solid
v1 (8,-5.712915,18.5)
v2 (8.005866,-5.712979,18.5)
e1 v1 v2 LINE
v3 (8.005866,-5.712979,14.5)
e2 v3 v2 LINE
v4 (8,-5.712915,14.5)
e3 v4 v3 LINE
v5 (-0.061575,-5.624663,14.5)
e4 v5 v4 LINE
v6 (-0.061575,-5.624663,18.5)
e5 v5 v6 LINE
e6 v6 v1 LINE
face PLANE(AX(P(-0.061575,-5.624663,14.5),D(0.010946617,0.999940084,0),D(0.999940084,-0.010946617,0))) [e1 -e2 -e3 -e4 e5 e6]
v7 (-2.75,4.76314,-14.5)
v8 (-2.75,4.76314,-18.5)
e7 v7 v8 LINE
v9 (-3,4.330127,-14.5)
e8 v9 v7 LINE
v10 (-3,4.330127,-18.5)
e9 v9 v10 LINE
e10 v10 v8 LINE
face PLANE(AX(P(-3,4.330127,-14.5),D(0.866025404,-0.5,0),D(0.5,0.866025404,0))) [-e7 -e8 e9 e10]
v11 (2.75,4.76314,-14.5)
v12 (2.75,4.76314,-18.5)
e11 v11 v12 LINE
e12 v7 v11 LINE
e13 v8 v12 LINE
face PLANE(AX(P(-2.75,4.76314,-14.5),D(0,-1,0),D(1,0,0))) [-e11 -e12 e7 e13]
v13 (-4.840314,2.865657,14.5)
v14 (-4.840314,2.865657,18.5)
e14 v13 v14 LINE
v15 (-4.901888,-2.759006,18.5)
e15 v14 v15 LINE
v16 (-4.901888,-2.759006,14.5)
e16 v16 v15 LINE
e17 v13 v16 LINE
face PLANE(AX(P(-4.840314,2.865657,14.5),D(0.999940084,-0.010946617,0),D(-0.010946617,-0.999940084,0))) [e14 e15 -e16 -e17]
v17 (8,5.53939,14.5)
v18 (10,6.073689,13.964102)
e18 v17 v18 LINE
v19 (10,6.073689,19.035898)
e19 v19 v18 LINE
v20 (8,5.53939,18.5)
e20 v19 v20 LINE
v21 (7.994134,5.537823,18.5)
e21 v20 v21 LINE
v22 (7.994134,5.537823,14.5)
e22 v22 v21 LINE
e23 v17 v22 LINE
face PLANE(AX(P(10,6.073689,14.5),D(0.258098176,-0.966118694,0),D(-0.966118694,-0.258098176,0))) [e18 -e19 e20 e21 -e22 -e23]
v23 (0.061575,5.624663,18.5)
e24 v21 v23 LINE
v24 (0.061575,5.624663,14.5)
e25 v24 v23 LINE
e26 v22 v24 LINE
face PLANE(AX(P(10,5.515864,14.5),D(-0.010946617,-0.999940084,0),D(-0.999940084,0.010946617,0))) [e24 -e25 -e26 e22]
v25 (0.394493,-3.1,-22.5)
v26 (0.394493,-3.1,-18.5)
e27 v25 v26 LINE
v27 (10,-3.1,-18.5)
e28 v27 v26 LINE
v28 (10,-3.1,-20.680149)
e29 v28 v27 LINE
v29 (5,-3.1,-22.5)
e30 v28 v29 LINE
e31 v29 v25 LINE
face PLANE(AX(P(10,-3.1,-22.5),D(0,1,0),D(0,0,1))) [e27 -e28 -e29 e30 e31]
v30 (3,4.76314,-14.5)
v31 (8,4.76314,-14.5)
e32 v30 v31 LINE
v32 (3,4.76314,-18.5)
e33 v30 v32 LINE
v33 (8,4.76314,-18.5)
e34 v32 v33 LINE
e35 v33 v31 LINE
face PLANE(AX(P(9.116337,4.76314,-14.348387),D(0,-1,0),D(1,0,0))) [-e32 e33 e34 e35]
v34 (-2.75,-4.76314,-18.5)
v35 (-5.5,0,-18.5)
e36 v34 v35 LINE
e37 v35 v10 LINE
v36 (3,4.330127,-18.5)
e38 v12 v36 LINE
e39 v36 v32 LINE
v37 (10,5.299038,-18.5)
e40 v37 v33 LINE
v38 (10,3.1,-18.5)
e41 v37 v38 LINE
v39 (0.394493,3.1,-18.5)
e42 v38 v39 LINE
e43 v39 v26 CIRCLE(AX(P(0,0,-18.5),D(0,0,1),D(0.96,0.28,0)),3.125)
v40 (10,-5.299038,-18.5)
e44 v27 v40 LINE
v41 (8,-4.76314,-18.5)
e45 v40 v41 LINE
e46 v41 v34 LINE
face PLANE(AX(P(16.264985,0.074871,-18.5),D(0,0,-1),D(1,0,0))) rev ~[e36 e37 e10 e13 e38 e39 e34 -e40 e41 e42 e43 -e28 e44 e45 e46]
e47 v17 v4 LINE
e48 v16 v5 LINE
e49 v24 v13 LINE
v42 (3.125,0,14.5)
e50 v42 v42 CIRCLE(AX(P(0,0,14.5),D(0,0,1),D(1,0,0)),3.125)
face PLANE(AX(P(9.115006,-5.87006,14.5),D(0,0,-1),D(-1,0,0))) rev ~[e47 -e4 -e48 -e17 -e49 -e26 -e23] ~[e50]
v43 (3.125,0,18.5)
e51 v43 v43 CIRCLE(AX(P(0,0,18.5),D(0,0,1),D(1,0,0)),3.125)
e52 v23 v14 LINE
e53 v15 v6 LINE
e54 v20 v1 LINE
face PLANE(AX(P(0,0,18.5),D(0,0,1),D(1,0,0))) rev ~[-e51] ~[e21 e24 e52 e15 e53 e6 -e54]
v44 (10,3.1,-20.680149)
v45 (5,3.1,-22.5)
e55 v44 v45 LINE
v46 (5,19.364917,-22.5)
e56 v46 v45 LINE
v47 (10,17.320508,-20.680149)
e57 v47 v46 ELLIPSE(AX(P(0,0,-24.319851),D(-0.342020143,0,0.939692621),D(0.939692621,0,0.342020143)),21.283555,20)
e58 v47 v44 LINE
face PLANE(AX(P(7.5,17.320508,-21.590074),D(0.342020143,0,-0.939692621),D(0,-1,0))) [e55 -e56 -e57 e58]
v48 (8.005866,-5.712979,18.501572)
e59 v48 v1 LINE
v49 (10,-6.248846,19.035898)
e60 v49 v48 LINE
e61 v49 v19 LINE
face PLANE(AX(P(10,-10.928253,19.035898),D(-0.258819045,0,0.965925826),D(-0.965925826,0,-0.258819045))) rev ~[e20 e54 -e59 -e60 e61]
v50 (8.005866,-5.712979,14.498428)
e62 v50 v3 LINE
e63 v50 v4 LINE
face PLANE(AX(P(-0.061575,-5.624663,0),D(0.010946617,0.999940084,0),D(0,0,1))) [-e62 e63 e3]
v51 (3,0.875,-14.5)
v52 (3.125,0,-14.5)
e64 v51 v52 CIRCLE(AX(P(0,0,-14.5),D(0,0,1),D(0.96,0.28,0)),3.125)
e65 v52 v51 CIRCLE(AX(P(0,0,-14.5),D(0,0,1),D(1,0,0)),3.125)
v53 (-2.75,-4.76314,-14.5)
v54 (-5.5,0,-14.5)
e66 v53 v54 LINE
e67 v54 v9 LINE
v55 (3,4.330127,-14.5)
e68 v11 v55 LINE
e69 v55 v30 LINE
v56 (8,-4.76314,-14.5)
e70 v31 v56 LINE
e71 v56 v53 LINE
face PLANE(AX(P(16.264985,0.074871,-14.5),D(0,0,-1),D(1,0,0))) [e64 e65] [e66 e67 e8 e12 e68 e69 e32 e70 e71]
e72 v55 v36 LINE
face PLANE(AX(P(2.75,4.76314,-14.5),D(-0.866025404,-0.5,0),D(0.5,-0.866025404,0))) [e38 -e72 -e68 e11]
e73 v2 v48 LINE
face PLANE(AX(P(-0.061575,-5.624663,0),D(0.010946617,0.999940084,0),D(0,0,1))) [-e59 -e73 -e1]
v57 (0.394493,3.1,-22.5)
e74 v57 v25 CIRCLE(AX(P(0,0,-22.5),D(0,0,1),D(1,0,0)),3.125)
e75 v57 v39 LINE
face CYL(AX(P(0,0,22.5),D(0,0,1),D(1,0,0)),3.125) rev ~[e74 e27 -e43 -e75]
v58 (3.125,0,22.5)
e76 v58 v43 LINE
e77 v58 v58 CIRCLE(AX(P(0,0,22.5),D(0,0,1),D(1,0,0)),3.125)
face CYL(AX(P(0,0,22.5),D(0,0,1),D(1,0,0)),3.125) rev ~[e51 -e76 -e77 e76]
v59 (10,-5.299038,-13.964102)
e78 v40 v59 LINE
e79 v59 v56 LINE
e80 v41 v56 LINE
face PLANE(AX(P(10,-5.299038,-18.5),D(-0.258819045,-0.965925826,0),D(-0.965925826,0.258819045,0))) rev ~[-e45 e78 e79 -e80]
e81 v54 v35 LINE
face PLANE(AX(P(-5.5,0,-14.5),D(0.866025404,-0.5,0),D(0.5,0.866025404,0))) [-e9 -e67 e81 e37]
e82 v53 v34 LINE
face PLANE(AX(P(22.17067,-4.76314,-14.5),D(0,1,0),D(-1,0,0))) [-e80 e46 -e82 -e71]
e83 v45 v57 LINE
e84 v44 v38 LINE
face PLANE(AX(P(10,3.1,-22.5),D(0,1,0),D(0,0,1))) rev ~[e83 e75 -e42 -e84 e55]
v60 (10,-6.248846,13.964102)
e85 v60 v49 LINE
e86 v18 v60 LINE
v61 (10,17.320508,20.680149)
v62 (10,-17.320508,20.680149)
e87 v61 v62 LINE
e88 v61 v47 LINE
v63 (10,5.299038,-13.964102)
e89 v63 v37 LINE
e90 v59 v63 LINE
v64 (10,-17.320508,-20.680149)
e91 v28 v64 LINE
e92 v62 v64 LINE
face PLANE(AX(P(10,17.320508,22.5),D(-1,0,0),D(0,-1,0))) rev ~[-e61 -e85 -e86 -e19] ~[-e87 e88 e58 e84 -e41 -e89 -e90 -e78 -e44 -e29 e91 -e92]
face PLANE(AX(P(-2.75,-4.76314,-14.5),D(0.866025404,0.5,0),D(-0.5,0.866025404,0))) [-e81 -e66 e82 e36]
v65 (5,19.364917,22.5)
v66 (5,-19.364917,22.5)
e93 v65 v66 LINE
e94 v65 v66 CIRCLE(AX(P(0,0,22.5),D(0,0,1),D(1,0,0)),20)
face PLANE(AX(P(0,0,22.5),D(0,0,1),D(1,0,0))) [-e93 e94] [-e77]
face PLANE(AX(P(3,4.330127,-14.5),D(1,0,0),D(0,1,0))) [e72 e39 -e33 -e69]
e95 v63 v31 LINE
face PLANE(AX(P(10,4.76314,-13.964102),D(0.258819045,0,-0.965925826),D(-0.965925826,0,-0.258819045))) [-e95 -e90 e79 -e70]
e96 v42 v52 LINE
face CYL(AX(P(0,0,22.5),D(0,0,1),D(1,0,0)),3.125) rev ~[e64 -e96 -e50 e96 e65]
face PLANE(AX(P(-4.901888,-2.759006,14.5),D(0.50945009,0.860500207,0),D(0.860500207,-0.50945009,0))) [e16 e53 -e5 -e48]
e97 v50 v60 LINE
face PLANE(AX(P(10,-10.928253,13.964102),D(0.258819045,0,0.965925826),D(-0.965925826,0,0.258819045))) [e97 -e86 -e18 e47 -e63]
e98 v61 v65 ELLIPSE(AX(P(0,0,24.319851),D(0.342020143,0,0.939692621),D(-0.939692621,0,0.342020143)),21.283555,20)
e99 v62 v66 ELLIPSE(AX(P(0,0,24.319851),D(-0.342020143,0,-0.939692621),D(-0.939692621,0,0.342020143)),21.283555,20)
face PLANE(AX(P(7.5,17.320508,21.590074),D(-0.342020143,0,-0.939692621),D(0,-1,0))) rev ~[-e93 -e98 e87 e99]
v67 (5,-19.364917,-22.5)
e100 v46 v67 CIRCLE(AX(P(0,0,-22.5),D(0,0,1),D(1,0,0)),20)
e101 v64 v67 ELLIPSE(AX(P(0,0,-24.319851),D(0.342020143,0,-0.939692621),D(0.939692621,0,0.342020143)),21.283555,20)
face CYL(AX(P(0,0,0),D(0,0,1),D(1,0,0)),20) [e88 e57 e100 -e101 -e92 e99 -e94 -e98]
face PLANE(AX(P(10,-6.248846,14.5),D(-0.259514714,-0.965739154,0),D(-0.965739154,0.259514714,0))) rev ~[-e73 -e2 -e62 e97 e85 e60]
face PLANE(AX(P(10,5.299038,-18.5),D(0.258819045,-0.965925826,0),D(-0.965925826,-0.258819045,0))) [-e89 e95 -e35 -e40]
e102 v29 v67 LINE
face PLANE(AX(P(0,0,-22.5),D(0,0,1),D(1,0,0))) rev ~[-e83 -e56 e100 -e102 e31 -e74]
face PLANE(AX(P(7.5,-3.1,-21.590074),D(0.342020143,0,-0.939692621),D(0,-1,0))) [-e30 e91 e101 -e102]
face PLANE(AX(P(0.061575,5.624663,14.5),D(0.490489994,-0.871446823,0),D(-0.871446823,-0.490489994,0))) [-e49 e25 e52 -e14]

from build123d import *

# Parameters (mm, degrees)
F0_R          = 20
F1_DEPTH      = 22.5
F2_R          = 3.125
F3_DEPTH      = 4
F5_DEPTH      = 45.001
F9_DEPTH      = 4
F12_W         = 6.2
F12_H         = 4
F13_DEPTH     = 10
F14_SIZE2     = 5
F14_SIZE      = 1.8198511713
F15_T1_DEPTH  = 9.5262794416
F15_T3_DEPTH  = 4
F15_T5_DEPTH  = 4
F15_T10_DEPTH = 21.6375603763
F15_T16_DEPTH = 21.6375603763
F15_T23_DEPTH = 14.719722582
F15_T27_DEPTH = 9.1934431404
F15_T34_DEPTH = 9.1934431404
F15_T38_DEPTH = 14.719722582
F15_T45_DEPTH = 21.6375603763
F15_T49_DEPTH = 9.179576725
F15_T56_DEPTH = 21.6375603763
F15_T60_DEPTH = 9.2078904559
F15_T67_DEPTH = 9.2078904559
F15_T72_DEPTH = 21.6375603763
F15_T79_DEPTH = 9.179576725
F15_T84_DEPTH = 21.6375603763


# Not quite as in the source:
# - a fillet or chamfer that OpenCascade refuses, or shapes differently, is made with other operations: its cross-section is extruded or revolved along the edge and cut away or added


with BuildPart() as f1:
    # F0 (on Top) → F1 (new body, symmetric)
    with BuildSketch(Plane.XY):
        Circle(F0_R)
    extrude(amount=F1_DEPTH, both=True)


with BuildPart() as f3:
    # F2 (on face) → F3 (new body)
    with BuildSketch(Plane.XY.offset(22.5)):
        Polygon((4.8403136616, -2.8656567585), (4.9018883821, 2.759006214), (0.0615747205, 5.6246629725), (-4.8403136616, 2.8656567585), (-4.9018883821, -2.759006214), (-0.0615747205, -5.6246629725), align=None)
        Circle(F2_R, mode=Mode.SUBTRACT)
        Polygon((0.0615747205, 5.6246629725), (4.9018883821, 2.759006214), (4.8403136616, -2.8656567585), (-0.0615747205, -5.6246629725), (10, -5.7348097768), (10, 5.5158643187), align=None)
        Circle(F2_R)
    extrude(amount=F3_DEPTH)


with BuildPart() as f3b:
    # F2 (on face) → F3, piece 2 (new body)
    with BuildSketch(Plane.XY.offset(22.5)):
        with BuildLine():
            Line((49.1066566767, 5.0877530758), (19.2531154371, 5.4145679388))
            ThreePointArc((19.2531154371, 5.4145679388), (19.812399006, 2.7329188844), (20, 0))
            ThreePointArc((20, 0), (19.7812957099, -2.9496338823), (19.1299659961, -5.8347580061))
            Line((19.1299659961, -5.8347580061), (49.1066566767, -6.1629210197))
            Line((49.1066566767, -6.1629210197), (49.1066566767, 5.0877530758))
        make_face()
    extrude(amount=F3_DEPTH)


with BuildPart() as f3_1:
    # F4: moved
    add(f3.part.moved(Location((0, 0, -8))))


with BuildPart() as f5_tool:
    # F2 (on face) → F5 (new body, through all)
    with BuildSketch(Plane.XY.offset(22.5)):
        Circle(F2_R)
        with BuildLine():
            Line((10, 17.3205080757), (10, 5.5158643187))
            Line((10, 5.5158643187), (19.2531154371, 5.4145679388))
            ThreePointArc((19.2531154371, 5.4145679388), (15.7915814069, 12.2729766833), (10, 17.3205080757))
        make_face()
        with BuildLine():
            Line((19.2531154371, 5.4145679388), (10, 5.5158643187))
            Line((10, 5.5158643187), (10, -5.7348097768))
            Line((10, -5.7348097768), (19.1299659961, -5.8347580061))
            ThreePointArc((19.1299659961, -5.8347580061), (19.7812957099, -2.9496338823), (20, 0))
            ThreePointArc((20, 0), (19.812399006, 2.7329188844), (19.2531154371, 5.4145679388))
        make_face()
        with BuildLine():
            Line((19.1299659961, -5.8347580061), (10, -5.7348097768))
            Line((10, -5.7348097768), (10, -17.3205080757))
            ThreePointArc((10, -17.3205080757), (15.6562876634, -12.4451057288), (19.1299659961, -5.8347580061))
        make_face()
    extrude(amount=-F5_DEPTH)


with BuildPart() as f1_1:
    add(f1.part)

    # F5: cut by f5_tool
    add(f5_tool.part, mode=Mode.SUBTRACT)


with BuildPart() as f3_2:
    add(f3_1.part)

    # F5: cut by f5_tool
    add(f5_tool.part, mode=Mode.SUBTRACT)


with BuildPart() as f1_2:
    add(f1_1.part)

    # F7: cut F3
    add(f3_2.part, mode=Mode.SUBTRACT)


with BuildPart() as f9:
    # F8 (on face) → F9 (new body)
    with BuildSketch(Plane(origin=(0, 0, -22.5), x_dir=(1, 0, 0), z_dir=(0, 0, -1))):
        Polygon((22.1706703305, 4.7631397208), (10, 4.7631397208), (10, -4.7631397208), (22.864067927, -4.7631397208), align=None)
        Polygon((2.75, 4.7631397208), (5.5, 0), (3, -4.3301270189), (3, -4.7631397208), (10, -4.7631397208), (10, 4.7631397208), align=None)
        with BuildLine():
            Line((3, -4.3301270189), (5.5, 0))
            Line((5.5, 0), (2.75, 4.7631397208))
            Line((2.75, 4.7631397208), (-2.75, 4.7631397208))
            Line((-2.75, 4.7631397208), (-5.5, 0))
            Line((-5.5, 0), (-3, -4.3301270189))
            Line((-3, -4.3301270189), (-3, -0.875))
            ThreePointArc((-3, -0.875), (-0.4419417382, 3.0935921677), (3.125, 0))
            ThreePointArc((3.125, 0), (3.0935921677, -0.4419417382), (3, -0.875))
            Line((3, -0.875), (3, -4.3301270189))
        make_face()
        with BuildLine():
            Line((2.75, -4.7631397208), (3, -4.3301270189))
            Line((3, -4.3301270189), (3, -0.875))
            ThreePointArc((3, -0.875), (0, -3.125), (-3, -0.875))
            Line((-3, -0.875), (-3, -4.3301270189))
            Line((-3, -4.3301270189), (-2.75, -4.7631397208))
            Line((-2.75, -4.7631397208), (2.75, -4.7631397208))
        make_face()
    extrude(amount=F9_DEPTH)


with BuildPart() as f9_1:
    # F10: moved
    add(f9.part.moved(Location((0, 0, 8))))


with BuildPart() as f1_3:
    add(f1_2.part)

    # F11: cut F9
    add(f9_1.part, mode=Mode.SUBTRACT)

    # F12 (on face) → F13 (cut)
    with BuildSketch(Plane.YZ.offset(10)):
        with Locations((0, -20.5)):
            Rectangle(F12_W, F12_H)
    extrude(amount=-F13_DEPTH, mode=Mode.SUBTRACT)

    # F14
    f14_edges = [f1_3.edges().sort_by_distance(p)[0] for p in [
        (10, -10.210254, -22.5),
        (10, 10.210254, -22.5),
        (10, 0, 22.5),
    ]]
    f14_side = f1_3.faces().sort_by_distance((10, 0.003395, 0.271955))[0]
    chamfer(f14_edges, length=F14_SIZE, length2=F14_SIZE2, reference=f14_side)

    # F15: chamfer of 2 x 0.5358983849 on 7 edges, made by hand

    # F15_s2 → F15_t1 (cut)
    with BuildSketch(Plane.XZ.offset(-4.7631397208)):
        Polygon((10, -13.9641016151), (8, -14.5), (10, -14.5), align=None)
    extrude(amount=F15_T1_DEPTH, mode=Mode.SUBTRACT)

    # F15_s4 → F15_t3 (cut)
    with BuildSketch(Plane.XY.offset(14.5)):
        Polygon((10, 6.0736893602), (7.9941337256, 5.5378230842), (10, 5.5158643187), align=None)
        Polygon((10, -6.2488457266), (8.0058662744, -5.7129794507), (10, -5.7348097768), align=None)
    extrude(amount=F15_T3_DEPTH, mode=Mode.SUBTRACT)

    # F15_s6 → F15_t5 (cut)
    with BuildSketch(Plane.XY.offset(-18.5)):
        Polygon((10, -5.2990381057), (8, -4.7631397208), (10, -4.7631397208), align=None)
        Polygon((10, 5.2990381057), (8, 4.7631397208), (10, 4.7631397208), align=None)
    extrude(amount=F15_T5_DEPTH, mode=Mode.SUBTRACT)


with BuildPart() as f15_tool8:
    # F15_s9 → F15_t10 (new body)
    with BuildSketch(Plane.XZ.offset(10.9282529172)):
        Polygon((10, 13.9641016151), (8, 14.5), (10, 14.5), align=None)
    extrude(amount=-F15_T10_DEPTH)

    split(bisect_by=Plane(origin=(-0.0615747205, -5.6246629725, 0), x_dir=(0, 0, 1), z_dir=(0.010946617, 0.999940084, 0)), keep=Keep.TOP)

    split(bisect_by=Plane(origin=(0.0615747205, 5.6246629725, 0), x_dir=(0, 0, 1), z_dir=(-0.010946617, -0.999940084, 0)), keep=Keep.TOP)


with BuildPart() as f1_4:
    add(f1_3.part)

    # F15_t7: cut F15_tool8
    add(f15_tool8.part, mode=Mode.SUBTRACT)


with BuildPart() as f15_tool14:
    # F15_s15 → F15_t16 (new body)
    with BuildSketch(Plane.XZ.offset(10.9282529172)):
        Polygon((10, 19.0358983849), (8, 18.5), (10, 18.5), align=None)
    extrude(amount=-F15_T16_DEPTH)

    split(bisect_by=Plane(origin=(-0.0615747205, -5.6246629725, 0), x_dir=(0, 0, 1), z_dir=(0.010946617, 0.999940084, 0)), keep=Keep.TOP)

    split(bisect_by=Plane(origin=(0.0615747205, 5.6246629725, 0), x_dir=(0, 0, 1), z_dir=(-0.010946617, -0.999940084, 0)), keep=Keep.TOP)


with BuildPart() as f1_5:
    add(f1_4.part)

    # F15_t13: cut F15_tool14
    add(f15_tool14.part, mode=Mode.SUBTRACT)


with BuildPart() as f15_tool21:
    # F15_s22 → F15_t23 (new body)
    with BuildSketch(Plane.XZ.offset(-9.9565828612)):
        Polygon((10, -13.9641016151), (8, -14.5), (10, -14.5), align=None)
    extrude(amount=F15_T23_DEPTH)

    split(bisect_by=Plane.XZ.offset(-4.7631397208), keep=Keep.BOTTOM)


with BuildPart() as f15_tool25:
    # F15_s26 → F15_t27 (new body)
    with BuildSketch(Plane.XY.offset(-18.5)):
        Polygon((10, 5.2990381057), (8, 4.7631397208), (10, 4.7631397208), align=None)
    extrude(amount=F15_T27_DEPTH)

    split(bisect_by=Plane.XY.offset(-14.5), keep=Keep.TOP)


with BuildPart() as f15_tool21_1:
    add(f15_tool21.part)

    # F15_t29: intersect F15_tool25
    add(f15_tool25.part, mode=Mode.INTERSECT)


with BuildPart() as f1_6:
    add(f1_5.part)

    # F15_t19: cut F15_tool21
    add(f15_tool21_1.part, mode=Mode.SUBTRACT)


with BuildPart() as f15_tool32:
    # F15_s33 → F15_t34 (new body)
    with BuildSketch(Plane.XY.offset(-9.3065568596)):
        Polygon((10, -5.2990381057), (8, -4.7631397208), (10, -4.7631397208), align=None)
    extrude(amount=-F15_T34_DEPTH)

    split(bisect_by=Plane.XY.offset(-14.5), keep=Keep.TOP)


with BuildPart() as f15_tool36:
    # F15_s37 → F15_t38 (new body)
    with BuildSketch(Plane.XZ.offset(-4.7631397208)):
        Polygon((10, -13.9641016151), (8, -14.5), (10, -14.5), align=None)
    extrude(amount=F15_T38_DEPTH)

    split(bisect_by=Plane.XZ.offset(4.7631397208), keep=Keep.TOP)


with BuildPart() as f15_tool32_1:
    add(f15_tool32.part)

    # F15_t40: intersect F15_tool36
    add(f15_tool36.part, mode=Mode.INTERSECT)


with BuildPart() as f1_7:
    add(f1_6.part)

    # F15_t30: cut F15_tool32
    add(f15_tool32_1.part, mode=Mode.SUBTRACT)


with BuildPart() as f15_tool43:
    # F15_s44 → F15_t45 (new body)
    with BuildSketch(Plane.XZ.offset(10.9282529172)):
        Polygon((10, 13.9641016151), (8, 14.5), (10, 14.5), align=None)
    extrude(amount=-F15_T45_DEPTH)

    split(bisect_by=Plane(origin=(-0.0615747205, -5.6246629725, 0), x_dir=(0, 0, 1), z_dir=(-0.010946617, -0.999940084, 0)), keep=Keep.TOP)


with BuildPart() as f15_tool47:
    # F15_s48 → F15_t49 (new body)
    with BuildSketch(Plane.XY.offset(9.320423275)):
        Polygon((10, -6.2488457266), (8.0058662744, -5.7129794507), (10, -5.7348097768), align=None)
    extrude(amount=F15_T49_DEPTH)

    split(bisect_by=Plane.XY.offset(14.5), keep=Keep.BOTTOM)


with BuildPart() as f15_tool43_1:
    add(f15_tool43.part)

    # F15_t51: intersect F15_tool47
    add(f15_tool47.part, mode=Mode.INTERSECT)


with BuildPart() as f1_8:
    add(f1_7.part)

    # F15_t41: cut F15_tool43
    add(f15_tool43_1.part, mode=Mode.SUBTRACT)


with BuildPart() as f15_tool54:
    # F15_s55 → F15_t56 (new body)
    with BuildSketch(Plane.XZ.offset(10.9282529172)):
        Polygon((10, 13.9641016151), (8, 14.5), (10, 14.5), align=None)
    extrude(amount=-F15_T56_DEPTH)

    split(bisect_by=Plane(origin=(0.0615747205, 5.6246629725, 0), x_dir=(0, 0, 1), z_dir=(0.010946617, 0.999940084, 0)), keep=Keep.TOP)


with BuildPart() as f15_tool58:
    # F15_s59 → F15_t60 (new body)
    with BuildSketch(Plane.XY.offset(9.2921095441)):
        Polygon((10, 6.0736893602), (7.9941337256, 5.5378230842), (10, 5.5158643187), align=None)
    extrude(amount=F15_T60_DEPTH)

    split(bisect_by=Plane.XY.offset(14.5), keep=Keep.BOTTOM)


with BuildPart() as f15_tool54_1:
    add(f15_tool54.part)

    # F15_t62: intersect F15_tool58
    add(f15_tool58.part, mode=Mode.INTERSECT)


with BuildPart() as f1_9:
    add(f1_8.part)

    # F15_t52: cut F15_tool54
    add(f15_tool54_1.part, mode=Mode.SUBTRACT)


with BuildPart() as f15_tool65:
    # F15_s66 → F15_t67 (new body)
    with BuildSketch(Plane.XY.offset(14.5)):
        Polygon((10, 6.0736893602), (7.9941337256, 5.5378230842), (10, 5.5158643187), align=None)
    extrude(amount=F15_T67_DEPTH)

    split(bisect_by=Plane(origin=(7.8162495012, 0, 21.4749690093), x_dir=(0, 1, 0), z_dir=(-0.3420201433, 0, -0.9396926208)), keep=Keep.TOP)

    split(bisect_by=Plane.XY.offset(18.5), keep=Keep.TOP)


with BuildPart() as f15_tool70:
    # F15_s71 → F15_t72 (new body)
    with BuildSketch(Plane.XZ.offset(10.9282529172)):
        Polygon((10, 19.0358983849), (8, 18.5), (10, 18.5), align=None)
    extrude(amount=-F15_T72_DEPTH)

    split(bisect_by=Plane(origin=(0.0615747205, 5.6246629725, 0), x_dir=(0, 0, 1), z_dir=(0.010946617, 0.999940084, 0)), keep=Keep.TOP)


with BuildPart() as f15_tool65_1:
    add(f15_tool65.part)

    # F15_t74: intersect F15_tool70
    add(f15_tool70.part, mode=Mode.INTERSECT)


with BuildPart() as f1_10:
    add(f1_9.part)

    # F15_t63: cut F15_tool65
    add(f15_tool65_1.part, mode=Mode.SUBTRACT)


with BuildPart() as f15_tool77:
    # F15_s78 → F15_t79 (new body)
    with BuildSketch(Plane.XY.offset(14.5)):
        Polygon((10, -6.2488457266), (8.0058662744, -5.7129794507), (10, -5.7348097768), align=None)
    extrude(amount=F15_T79_DEPTH)

    split(bisect_by=Plane(origin=(7.8162495012, 0, 21.4749690093), x_dir=(0, 1, 0), z_dir=(-0.3420201433, 0, -0.9396926208)), keep=Keep.TOP)

    split(bisect_by=Plane.XY.offset(18.5), keep=Keep.TOP)


with BuildPart() as f15_tool82:
    # F15_s83 → F15_t84 (new body)
    with BuildSketch(Plane.XZ.offset(10.9282529172)):
        Polygon((10, 19.0358983849), (8, 18.5), (10, 18.5), align=None)
    extrude(amount=-F15_T84_DEPTH)

    split(bisect_by=Plane(origin=(-0.0615747205, -5.6246629725, 0), x_dir=(0, 0, 1), z_dir=(-0.010946617, -0.999940084, 0)), keep=Keep.TOP)


with BuildPart() as f15_tool77_1:
    add(f15_tool77.part)

    # F15_t86: intersect F15_tool82
    add(f15_tool82.part, mode=Mode.INTERSECT)


with BuildPart() as f1_11:
    add(f1_10.part)

    # F15_t75: cut F15_tool77
    add(f15_tool77_1.part, mode=Mode.SUBTRACT)


solid = f1_11.part
